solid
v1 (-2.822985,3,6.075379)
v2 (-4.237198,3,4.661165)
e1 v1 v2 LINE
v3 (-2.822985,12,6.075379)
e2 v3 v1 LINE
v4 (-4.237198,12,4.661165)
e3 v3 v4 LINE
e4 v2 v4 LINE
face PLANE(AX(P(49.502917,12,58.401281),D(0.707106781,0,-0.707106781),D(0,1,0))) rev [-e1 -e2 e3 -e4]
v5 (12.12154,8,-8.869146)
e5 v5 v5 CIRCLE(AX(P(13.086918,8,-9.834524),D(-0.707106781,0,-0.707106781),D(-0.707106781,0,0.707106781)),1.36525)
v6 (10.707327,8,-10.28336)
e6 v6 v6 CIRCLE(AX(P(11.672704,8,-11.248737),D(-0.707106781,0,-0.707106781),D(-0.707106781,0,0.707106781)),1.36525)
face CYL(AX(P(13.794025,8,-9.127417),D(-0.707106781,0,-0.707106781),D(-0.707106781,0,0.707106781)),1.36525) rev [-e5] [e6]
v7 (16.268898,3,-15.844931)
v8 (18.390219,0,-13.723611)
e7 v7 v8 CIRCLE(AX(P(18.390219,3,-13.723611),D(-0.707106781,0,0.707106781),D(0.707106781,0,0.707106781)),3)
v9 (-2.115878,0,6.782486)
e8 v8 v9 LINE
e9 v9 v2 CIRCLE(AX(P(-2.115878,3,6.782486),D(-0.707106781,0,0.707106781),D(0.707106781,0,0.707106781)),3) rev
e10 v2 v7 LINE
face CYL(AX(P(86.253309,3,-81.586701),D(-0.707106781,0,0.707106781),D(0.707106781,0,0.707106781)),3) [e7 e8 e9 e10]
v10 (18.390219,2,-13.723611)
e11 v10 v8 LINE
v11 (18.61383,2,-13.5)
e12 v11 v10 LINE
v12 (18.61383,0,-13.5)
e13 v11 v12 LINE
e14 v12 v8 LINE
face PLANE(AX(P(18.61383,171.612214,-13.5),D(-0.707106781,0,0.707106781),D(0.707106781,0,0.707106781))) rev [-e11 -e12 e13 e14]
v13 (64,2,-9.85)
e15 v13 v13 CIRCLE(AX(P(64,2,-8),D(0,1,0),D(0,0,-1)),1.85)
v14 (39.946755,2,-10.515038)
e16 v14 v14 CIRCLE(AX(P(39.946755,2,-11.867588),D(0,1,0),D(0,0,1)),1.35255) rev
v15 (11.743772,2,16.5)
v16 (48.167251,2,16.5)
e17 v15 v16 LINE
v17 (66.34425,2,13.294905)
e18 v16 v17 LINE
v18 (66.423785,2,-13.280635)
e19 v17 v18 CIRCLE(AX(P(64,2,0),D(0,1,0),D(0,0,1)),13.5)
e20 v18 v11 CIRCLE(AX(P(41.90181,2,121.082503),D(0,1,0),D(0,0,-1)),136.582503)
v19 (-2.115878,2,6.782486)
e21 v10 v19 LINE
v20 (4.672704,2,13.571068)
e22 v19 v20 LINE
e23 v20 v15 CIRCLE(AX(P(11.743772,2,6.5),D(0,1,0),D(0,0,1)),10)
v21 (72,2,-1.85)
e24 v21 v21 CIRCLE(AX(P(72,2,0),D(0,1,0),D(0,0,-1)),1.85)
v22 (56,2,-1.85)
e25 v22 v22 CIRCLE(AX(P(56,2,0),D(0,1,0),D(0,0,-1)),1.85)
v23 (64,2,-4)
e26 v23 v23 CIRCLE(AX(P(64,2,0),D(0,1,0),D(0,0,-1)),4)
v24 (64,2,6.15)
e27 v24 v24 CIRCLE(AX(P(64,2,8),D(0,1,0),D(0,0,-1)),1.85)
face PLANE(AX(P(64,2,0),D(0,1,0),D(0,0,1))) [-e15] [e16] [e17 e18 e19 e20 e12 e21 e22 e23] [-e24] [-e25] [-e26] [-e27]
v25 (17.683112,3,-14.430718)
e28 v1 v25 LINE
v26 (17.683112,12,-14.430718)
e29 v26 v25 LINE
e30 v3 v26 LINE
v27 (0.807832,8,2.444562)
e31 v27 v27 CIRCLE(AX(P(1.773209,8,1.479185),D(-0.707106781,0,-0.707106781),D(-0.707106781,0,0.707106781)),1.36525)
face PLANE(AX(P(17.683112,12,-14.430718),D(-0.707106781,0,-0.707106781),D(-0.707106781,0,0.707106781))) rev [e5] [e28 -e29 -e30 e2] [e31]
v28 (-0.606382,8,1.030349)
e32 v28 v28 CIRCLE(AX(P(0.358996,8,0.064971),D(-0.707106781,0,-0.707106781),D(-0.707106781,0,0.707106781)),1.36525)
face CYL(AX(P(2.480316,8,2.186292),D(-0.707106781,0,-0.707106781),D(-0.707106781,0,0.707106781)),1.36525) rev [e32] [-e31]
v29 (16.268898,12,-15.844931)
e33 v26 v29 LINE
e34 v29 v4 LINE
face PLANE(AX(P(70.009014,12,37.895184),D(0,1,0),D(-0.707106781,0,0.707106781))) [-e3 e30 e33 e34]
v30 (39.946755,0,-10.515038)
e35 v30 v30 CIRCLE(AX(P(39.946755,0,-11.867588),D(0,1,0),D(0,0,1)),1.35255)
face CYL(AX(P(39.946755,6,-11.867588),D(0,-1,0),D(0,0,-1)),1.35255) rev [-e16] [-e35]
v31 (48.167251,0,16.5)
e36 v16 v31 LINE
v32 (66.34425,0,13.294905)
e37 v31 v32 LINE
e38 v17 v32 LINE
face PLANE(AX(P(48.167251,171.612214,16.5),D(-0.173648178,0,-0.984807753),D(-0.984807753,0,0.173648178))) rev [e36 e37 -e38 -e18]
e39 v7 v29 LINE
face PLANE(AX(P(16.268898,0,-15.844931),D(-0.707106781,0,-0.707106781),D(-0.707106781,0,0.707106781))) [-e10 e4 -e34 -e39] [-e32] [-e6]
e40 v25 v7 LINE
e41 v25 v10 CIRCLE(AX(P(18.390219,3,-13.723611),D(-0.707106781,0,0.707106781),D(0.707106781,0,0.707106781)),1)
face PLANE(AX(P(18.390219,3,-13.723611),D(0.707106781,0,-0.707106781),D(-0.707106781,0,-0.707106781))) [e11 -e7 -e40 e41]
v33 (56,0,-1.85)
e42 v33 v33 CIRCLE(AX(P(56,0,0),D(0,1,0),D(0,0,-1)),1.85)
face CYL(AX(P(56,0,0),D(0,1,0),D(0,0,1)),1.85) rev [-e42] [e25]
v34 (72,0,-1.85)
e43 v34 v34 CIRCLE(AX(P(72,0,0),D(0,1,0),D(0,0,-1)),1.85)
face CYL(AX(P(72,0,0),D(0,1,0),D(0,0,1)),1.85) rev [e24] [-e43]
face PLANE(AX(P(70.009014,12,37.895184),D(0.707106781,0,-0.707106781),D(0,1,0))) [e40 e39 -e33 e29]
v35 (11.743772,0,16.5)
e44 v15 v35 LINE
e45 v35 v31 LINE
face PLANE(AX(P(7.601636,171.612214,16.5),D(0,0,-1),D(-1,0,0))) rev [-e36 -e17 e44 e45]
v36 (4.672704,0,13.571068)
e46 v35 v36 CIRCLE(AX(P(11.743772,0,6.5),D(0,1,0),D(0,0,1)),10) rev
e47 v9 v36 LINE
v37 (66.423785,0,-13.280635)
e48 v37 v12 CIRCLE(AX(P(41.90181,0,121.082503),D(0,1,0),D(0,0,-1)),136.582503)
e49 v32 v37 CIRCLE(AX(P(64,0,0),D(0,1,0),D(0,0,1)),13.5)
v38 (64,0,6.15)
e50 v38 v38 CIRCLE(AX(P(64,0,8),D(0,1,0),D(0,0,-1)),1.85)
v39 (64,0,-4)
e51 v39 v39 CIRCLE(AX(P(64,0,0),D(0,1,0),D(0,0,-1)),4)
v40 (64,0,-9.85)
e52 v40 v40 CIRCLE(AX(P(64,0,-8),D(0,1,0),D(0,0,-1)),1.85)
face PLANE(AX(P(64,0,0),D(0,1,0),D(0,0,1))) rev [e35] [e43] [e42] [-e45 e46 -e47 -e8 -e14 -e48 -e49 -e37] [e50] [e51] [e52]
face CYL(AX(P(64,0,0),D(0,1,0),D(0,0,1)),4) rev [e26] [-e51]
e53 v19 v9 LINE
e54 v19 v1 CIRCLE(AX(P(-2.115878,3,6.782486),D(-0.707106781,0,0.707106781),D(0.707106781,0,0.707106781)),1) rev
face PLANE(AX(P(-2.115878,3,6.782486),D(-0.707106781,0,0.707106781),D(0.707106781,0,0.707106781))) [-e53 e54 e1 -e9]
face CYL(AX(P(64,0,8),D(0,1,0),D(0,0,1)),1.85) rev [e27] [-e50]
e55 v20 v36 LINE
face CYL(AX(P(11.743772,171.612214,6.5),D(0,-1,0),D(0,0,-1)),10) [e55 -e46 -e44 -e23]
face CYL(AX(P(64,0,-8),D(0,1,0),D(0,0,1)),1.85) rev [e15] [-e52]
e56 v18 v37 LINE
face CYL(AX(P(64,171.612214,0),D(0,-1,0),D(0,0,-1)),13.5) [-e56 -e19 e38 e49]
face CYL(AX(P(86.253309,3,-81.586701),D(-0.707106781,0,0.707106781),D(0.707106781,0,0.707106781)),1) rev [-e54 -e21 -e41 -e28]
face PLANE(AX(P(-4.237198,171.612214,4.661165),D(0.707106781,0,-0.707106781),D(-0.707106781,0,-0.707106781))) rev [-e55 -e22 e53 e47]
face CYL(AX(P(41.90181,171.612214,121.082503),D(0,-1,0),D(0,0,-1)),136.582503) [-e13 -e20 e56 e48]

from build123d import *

# Parameters (mm, degrees)
SKETCH1_R                  = 1.85
SKETCH1_R_2                = 4
BOSS_EXTRUDE1_DEPTH        = 2
BOSS_EXTRUDE3_DEPTH        = 10
SKETCH12_R                 = 1.36525
CUT_EXTRUDE2_DEPTH         = 3
SKETCH14_R                 = 1.35255
CUT_EXTRUDE3_DEPTH         = 6
FILLET1_R                  = 10
FLATTEN_BENDS1_START       = 2
FLATTEN_BENDS1_DEPTH       = 10
FLATTEN_BENDS1_2_OUTLINE_R = 1.36525
FLATTEN_BENDS1_2_DEPTH     = 2
PROCESS_BENDS1_START       = -8.401979777
PROCESS_BENDS1_OUTLINE_W   = 29
PROCESS_BENDS1_OUTLINE_H   = 2
PROCESS_BENDS1_DEPTH       = 8.701769682
PROCESS_BENDS1_START_2     = 0.591569905
PROCESS_BENDS1_2_OUTLINE_W = 29
PROCESS_BENDS1_2_OUTLINE_H = 10
PROCESS_BENDS1_2_OUTLINE_R = 1.36525
PROCESS_BENDS1_2_DEPTH     = 1.70822
PROCESS_BENDS1_START_3     = 0.299789905
PROCESS_BENDS1_3_OUTLINE_W = 29
PROCESS_BENDS1_3_OUTLINE_H = 10
PROCESS_BENDS1_3_OUTLINE_R = 1.36525
PROCESS_BENDS1_3_DEPTH     = 3
PROCESS_BENDS1_START_4     = -6.292093187
PROCESS_BENDS1_4_DEPTH     = 29


with BuildPart() as part:
    # Sketch1 → Boss-Extrude1 (new body)
    with BuildSketch(Plane(origin=(0, 2, 0), x_dir=(1, 0, 0), z_dir=(0, 1, 0))):
        with BuildLine():
            Line((16.268898369, 15.844931419), (-4.237198285, -4.661165235))
            Line((-4.237198285, -4.661165235), (7.60163648, -16.5))
            Line((7.60163648, -16.5), (48.167251499, -16.5))
            Line((48.167251499, -16.5), (66.344250399, -13.294904666))
            ThreePointArc((66.344250399, -13.294904666), (77.499939542, -0.040402458), (66.423785357, 13.280634945))
            ThreePointArc((66.423785357, 13.280634945), (42.528480772, 15.498562339), (18.613829789, 13.5))
            Line((18.613829789, 13.5), (16.268898369, 15.844931419))
        make_face()
        with Locations(Location((56, 0, 0), (0, 0, 90))):
            Circle(SKETCH1_R, mode=Mode.SUBTRACT)
        with Locations(Location((64, -8, 0), (0, 0, 90))):
            Circle(SKETCH1_R, mode=Mode.SUBTRACT)
        with Locations(Location((72, 0, 0), (0, 0, 90))):
            Circle(SKETCH1_R, mode=Mode.SUBTRACT)
        with Locations(Location((64, 8, 0), (0, 0, 90))):
            Circle(SKETCH1_R, mode=Mode.SUBTRACT)
        with Locations(Location((64, 0, 0), (0, 0, 90))):
            Circle(SKETCH1_R_2, mode=Mode.SUBTRACT)
    extrude(amount=-BOSS_EXTRUDE1_DEPTH)

    # Sketch5 → Boss-Extrude3 (add)
    with BuildSketch(Plane(origin=(0, 2, 0), x_dir=(1, 0, 0), z_dir=(0, 1, 0))):
        Polygon((16.268898369, 15.844931419), (-4.237198285, -4.661165235), (-2.822984723, -6.075378798), (17.683111932, 14.430717857), align=None)
    extrude(amount=BOSS_EXTRUDE3_DEPTH)

    # Sketch12 → Cut-Extrude2 (cut)
    with BuildSketch(Plane(origin=(0.211983475, 0, 0.211983475), x_dir=(-0.7071067811865475, 0, 0.7071067811865477), z_dir=(-0.7071067811865477, 0, -0.7071067811865475))):
        with Locations((-16.207906813, 8)):
            Circle(SKETCH12_R)
        with Locations((-0.207906813, 8)):
            Circle(SKETCH12_R)
    extrude(amount=-CUT_EXTRUDE2_DEPTH, mode=Mode.SUBTRACT)

    # Sketch14 → Cut-Extrude3 (cut)
    with BuildSketch(Plane(origin=(0, 0, 0), x_dir=(1, 0, 0), z_dir=(0, 1, 0))):
        with Locations(Location((39.946755384, 11.867587507, 0), (0, 0, 270))):
            Circle(SKETCH14_R)
    extrude(amount=CUT_EXTRUDE3_DEPTH, mode=Mode.SUBTRACT)

    # Fillet1
    fillet1_edges = [part.edges().sort_by_distance(p)[0] for p in [
        (7.60163648, 1, 16.5),
    ]]
    fillet(fillet1_edges, radius=FILLET1_R)

    # Flatten-Bends1: read off the stored shape, not the designer's step
    # Flatten-Bends1 outline → Flatten-Bends1 (cut)
    with BuildSketch(Plane(origin=(0, 0, 0), x_dir=(1, 0, 0), z_dir=(0, 1, 0)).offset(FLATTEN_BENDS1_START)):
        Polygon((17.683111932, 14.430717857), (16.479779049, 15.634050739), (16.268898369, 15.844931419), (-4.237198285, -4.661165235), (-4.026317605, -4.872045915), (-2.822984722, -6.075378798), align=None)
    extrude(amount=FLATTEN_BENDS1_DEPTH, mode=Mode.SUBTRACT)

    # Flatten-Bends1 2 outline → Flatten-Bends1 2 (add)
    with BuildSketch(Plane(origin=(0, 0, 0), x_dir=(1, 0, 0), z_dir=(0, 1, 0))):
        Polygon((-4.237198285, -4.661165235), (16.268898369, 15.844931419), (10.115818019, 21.99801177), (-10.390278636, 1.491915115), align=None)
        with Locations((-2.965657433, 3.259682068)):
            Circle(FLATTEN_BENDS1_2_OUTLINE_R, mode=Mode.SUBTRACT)
        with Locations((8.348051066, 14.573390567)):
            Circle(FLATTEN_BENDS1_2_OUTLINE_R, mode=Mode.SUBTRACT)
    extrude(amount=FLATTEN_BENDS1_2_DEPTH)

    # Process-Bends1: read off the stored shape, not the designer's step
    # Process-Bends1 outline → Process-Bends1 (cut)
    with BuildSketch(Plane(origin=(0, 0, 0), x_dir=(0.7071067811865471, 0, -0.707106781186548), z_dir=(0.707106781186548, 0, 0.707106781186547)).offset(PROCESS_BENDS1_START)):
        with Locations((8.207906813, 1)):
            Rectangle(PROCESS_BENDS1_OUTLINE_W, PROCESS_BENDS1_OUTLINE_H)
    extrude(amount=PROCESS_BENDS1_DEPTH, mode=Mode.SUBTRACT)

    # Process-Bends1 2 outline → Process-Bends1 2 (add)
    with BuildSketch(Plane(origin=(0, 0, 0), x_dir=(0.7071067811865471, 0, -0.707106781186548), z_dir=(0.707106781186548, 0, 0.707106781186547)).offset(PROCESS_BENDS1_START_2)):
        with Locations((8.207906813, 7)):
            Rectangle(PROCESS_BENDS1_2_OUTLINE_W, PROCESS_BENDS1_2_OUTLINE_H)
        with Locations((0.207906813, 8)):
            Circle(PROCESS_BENDS1_2_OUTLINE_R, mode=Mode.SUBTRACT)
        with Locations((16.207906813, 8)):
            Circle(PROCESS_BENDS1_2_OUTLINE_R, mode=Mode.SUBTRACT)
    extrude(amount=PROCESS_BENDS1_2_DEPTH)

    # Process-Bends1 3 outline → Process-Bends1 3 (add)
    with BuildSketch(Plane(origin=(0, 0, 0), x_dir=(0.7071067811865471, 0, -0.707106781186548), z_dir=(0.707106781186548, 0, 0.707106781186547)).offset(PROCESS_BENDS1_START_3)):
        with Locations((8.207906813, 7)):
            Rectangle(PROCESS_BENDS1_3_OUTLINE_W, PROCESS_BENDS1_3_OUTLINE_H)
        with Locations((0.207906813, 8)):
            Circle(PROCESS_BENDS1_3_OUTLINE_R, mode=Mode.SUBTRACT)
        with Locations((16.207906813, 8)):
            Circle(PROCESS_BENDS1_3_OUTLINE_R, mode=Mode.SUBTRACT)
    extrude(amount=PROCESS_BENDS1_3_DEPTH)

    # Process-Bends1 4 outline → Process-Bends1 4 (cut)
    with BuildSketch(Plane(origin=(0, 0, 0), x_dir=(0.7071067811865474, 0, 0.7071067811865477), z_dir=(0.7071067811865476, 0, -0.7071067811865476)).offset(PROCESS_BENDS1_START_4)):
        with BuildLine():
            ThreePointArc((3.299789905, -2), (2.592683124, -2.292893219), (2.299789905, -3))
            Line((2.299789905, -3), (2.299789905, -12))
            Line((2.299789905, -12), (3.299789905, -12))
            Line((3.299789905, -12), (3.299789905, -2))
        make_face()
        with BuildLine():
            Line((0.299789905, 0), (0.299789905, -3))
            ThreePointArc((0.299789905, -3), (1.178469562, -0.878679657), (3.299789905, 0))
            Line((3.299789905, 0), (0.299789905, 0))
        make_face()
    extrude(amount=PROCESS_BENDS1_4_DEPTH, mode=Mode.SUBTRACT)


solid = part.part
